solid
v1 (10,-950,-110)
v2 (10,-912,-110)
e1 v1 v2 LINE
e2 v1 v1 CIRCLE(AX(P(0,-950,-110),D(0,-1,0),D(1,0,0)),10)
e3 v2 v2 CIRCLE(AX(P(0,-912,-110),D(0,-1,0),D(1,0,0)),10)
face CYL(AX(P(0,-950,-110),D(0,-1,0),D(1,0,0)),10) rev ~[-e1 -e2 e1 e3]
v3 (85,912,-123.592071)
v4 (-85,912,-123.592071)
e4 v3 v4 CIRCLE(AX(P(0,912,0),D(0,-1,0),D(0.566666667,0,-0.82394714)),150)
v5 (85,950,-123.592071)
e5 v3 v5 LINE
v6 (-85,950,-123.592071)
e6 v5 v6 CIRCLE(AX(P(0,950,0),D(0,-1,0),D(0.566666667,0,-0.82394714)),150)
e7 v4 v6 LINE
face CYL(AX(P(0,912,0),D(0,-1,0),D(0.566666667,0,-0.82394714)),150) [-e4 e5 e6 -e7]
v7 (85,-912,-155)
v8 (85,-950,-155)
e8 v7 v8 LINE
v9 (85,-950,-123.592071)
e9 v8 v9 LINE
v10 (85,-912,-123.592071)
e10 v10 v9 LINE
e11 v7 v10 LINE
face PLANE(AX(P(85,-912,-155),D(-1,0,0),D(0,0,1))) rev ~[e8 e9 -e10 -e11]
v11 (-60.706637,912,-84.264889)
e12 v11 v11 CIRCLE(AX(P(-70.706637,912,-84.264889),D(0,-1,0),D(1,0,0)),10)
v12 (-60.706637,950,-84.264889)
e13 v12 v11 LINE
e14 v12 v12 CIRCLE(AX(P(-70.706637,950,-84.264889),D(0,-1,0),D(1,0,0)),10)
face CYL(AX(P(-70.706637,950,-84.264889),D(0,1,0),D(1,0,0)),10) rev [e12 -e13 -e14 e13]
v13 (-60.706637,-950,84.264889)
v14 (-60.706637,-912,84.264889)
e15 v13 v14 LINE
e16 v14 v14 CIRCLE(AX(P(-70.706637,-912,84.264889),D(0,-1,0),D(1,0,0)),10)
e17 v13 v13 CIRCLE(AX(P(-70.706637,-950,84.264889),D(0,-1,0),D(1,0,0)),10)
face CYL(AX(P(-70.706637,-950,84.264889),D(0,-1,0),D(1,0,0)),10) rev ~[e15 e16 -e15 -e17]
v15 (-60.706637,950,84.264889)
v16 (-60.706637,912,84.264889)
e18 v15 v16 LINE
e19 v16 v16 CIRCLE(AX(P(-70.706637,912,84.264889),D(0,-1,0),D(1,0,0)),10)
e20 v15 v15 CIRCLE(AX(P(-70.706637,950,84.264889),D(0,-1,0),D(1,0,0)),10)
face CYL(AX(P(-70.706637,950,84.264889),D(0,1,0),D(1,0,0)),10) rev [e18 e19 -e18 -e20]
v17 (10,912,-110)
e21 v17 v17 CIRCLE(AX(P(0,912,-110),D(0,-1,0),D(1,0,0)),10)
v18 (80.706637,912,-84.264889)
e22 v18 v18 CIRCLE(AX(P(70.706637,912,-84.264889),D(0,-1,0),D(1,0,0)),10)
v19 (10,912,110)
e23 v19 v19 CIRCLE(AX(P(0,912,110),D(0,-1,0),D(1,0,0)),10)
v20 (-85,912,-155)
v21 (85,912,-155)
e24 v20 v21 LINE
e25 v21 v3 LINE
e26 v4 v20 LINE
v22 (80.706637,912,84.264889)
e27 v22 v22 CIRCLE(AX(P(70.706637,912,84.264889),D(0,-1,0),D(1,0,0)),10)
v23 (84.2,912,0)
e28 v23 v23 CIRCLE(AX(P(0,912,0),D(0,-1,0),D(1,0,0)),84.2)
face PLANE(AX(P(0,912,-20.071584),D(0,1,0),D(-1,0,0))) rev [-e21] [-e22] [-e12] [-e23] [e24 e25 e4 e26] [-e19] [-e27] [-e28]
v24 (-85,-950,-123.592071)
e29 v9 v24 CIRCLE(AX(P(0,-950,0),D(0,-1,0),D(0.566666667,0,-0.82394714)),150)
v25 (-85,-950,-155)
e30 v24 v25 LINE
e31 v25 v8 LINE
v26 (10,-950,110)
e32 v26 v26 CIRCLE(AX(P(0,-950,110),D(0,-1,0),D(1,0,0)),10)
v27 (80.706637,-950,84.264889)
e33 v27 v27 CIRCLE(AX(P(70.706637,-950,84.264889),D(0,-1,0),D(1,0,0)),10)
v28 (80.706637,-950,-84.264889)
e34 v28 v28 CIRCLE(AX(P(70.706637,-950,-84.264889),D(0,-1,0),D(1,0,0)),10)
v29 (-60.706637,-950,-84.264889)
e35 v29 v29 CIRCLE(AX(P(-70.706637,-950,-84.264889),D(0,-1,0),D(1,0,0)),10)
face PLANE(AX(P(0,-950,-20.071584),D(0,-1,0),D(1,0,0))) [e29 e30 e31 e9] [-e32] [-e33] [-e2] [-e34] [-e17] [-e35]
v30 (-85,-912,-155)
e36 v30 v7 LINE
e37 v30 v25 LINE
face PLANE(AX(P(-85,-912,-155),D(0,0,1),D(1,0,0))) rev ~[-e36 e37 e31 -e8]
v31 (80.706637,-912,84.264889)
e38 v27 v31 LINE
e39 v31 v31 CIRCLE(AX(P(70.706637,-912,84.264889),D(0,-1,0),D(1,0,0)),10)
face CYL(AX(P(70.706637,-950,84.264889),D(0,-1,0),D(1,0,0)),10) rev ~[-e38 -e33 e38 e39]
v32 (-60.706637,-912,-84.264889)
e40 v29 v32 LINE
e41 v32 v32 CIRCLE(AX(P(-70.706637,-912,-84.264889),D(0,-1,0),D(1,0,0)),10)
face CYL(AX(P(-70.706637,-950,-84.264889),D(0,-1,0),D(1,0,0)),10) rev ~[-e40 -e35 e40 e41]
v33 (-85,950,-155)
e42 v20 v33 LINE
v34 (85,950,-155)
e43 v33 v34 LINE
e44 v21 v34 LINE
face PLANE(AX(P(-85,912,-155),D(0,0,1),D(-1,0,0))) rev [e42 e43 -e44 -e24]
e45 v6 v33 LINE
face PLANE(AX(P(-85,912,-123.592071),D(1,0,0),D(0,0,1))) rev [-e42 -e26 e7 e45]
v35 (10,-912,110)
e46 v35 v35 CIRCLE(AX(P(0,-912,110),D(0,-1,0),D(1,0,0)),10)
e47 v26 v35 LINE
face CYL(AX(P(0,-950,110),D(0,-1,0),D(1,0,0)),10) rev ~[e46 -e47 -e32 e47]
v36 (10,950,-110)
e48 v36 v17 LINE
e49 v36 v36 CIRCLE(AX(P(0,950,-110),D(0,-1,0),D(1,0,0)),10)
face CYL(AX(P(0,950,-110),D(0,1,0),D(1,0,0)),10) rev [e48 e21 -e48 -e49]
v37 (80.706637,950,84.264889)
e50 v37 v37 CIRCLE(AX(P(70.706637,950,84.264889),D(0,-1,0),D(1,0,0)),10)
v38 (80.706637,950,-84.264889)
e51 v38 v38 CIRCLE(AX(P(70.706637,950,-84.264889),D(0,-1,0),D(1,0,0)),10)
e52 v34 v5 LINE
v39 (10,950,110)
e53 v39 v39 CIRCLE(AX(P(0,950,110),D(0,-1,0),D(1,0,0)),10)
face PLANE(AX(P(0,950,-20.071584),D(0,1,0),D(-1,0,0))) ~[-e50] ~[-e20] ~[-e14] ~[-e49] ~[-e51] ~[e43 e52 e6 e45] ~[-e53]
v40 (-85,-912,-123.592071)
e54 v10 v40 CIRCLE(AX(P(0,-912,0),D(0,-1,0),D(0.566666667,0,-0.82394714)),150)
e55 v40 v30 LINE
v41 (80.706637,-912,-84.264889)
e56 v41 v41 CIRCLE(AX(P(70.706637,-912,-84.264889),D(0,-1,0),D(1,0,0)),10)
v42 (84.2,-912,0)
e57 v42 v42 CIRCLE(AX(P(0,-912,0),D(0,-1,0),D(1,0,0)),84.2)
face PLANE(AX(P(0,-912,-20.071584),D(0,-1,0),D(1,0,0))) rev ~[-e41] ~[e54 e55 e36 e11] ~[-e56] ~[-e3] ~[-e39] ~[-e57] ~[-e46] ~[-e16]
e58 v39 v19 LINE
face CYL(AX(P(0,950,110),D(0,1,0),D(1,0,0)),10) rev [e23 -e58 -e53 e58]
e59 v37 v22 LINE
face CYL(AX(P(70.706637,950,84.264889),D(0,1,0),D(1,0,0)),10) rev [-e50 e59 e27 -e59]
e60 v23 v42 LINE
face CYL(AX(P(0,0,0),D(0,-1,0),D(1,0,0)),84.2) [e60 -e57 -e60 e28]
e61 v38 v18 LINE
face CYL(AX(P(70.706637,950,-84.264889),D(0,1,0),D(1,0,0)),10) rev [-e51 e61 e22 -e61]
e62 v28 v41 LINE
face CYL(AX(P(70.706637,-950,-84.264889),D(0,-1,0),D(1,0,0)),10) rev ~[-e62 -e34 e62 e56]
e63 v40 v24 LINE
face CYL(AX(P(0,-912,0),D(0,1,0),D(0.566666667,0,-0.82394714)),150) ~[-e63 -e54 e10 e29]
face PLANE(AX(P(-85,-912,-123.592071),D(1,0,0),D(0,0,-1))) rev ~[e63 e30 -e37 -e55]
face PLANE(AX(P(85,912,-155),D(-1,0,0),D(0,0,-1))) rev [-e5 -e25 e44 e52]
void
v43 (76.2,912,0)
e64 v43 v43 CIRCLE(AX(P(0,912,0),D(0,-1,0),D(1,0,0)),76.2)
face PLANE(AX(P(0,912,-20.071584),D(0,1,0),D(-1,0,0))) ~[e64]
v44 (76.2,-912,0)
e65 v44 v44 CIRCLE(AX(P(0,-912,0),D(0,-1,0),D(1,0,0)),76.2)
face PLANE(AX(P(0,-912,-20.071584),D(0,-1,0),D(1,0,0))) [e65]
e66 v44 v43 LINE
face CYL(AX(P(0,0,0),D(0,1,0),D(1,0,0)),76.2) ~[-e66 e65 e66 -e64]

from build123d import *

# Parameters (mm, degrees)
F0_R      = 84.2
F0_R_2    = 76.2
F1_DEPTH  = 912
F2_R      = 75
F3_DEPTH  = 10
F4_R      = 10
F5_DEPTH  = 10
F8_DEPTH  = 38
F9_R      = 10
F10_DEPTH = 38


# Not quite as in the source:
# - a pattern or mirror of a feature is missing from the dataset's text; its kind, count and spacing are read off the source's solid
# - a feature names something its author has since deleted; it is built from what else it names


with BuildPart() as f1:
    # F0 (on Front) → F1 (new body, symmetric)
    with BuildSketch(Plane.XZ):
        Circle(F0_R)
        Circle(F0_R_2, mode=Mode.SUBTRACT)
    extrude(amount=F1_DEPTH, both=True)

    # F7 (on face) → F8 (join)
    with BuildSketch(Plane.XZ.offset(912)):
        with BuildLine():
            Line((85, -155), (85, -123.5920709431))
            ThreePointArc((85, -123.5920709431), (0, 150), (-85, -123.5920709431))
            Line((-85, -123.5920709431), (-85, -155))
            Line((-85, -155), (85, -155))
        make_face()
    f8 = extrude(amount=F8_DEPTH)

    # F8_copies: F8 across plane
    add(f8.mirror(Plane.ZX))

    # F9 (on face) → F10 (cut, through all)
    with BuildSketch(Plane.XZ.offset(950)):
        with Locations((-70.7066370655, 84.2648887431)):
            Circle(F9_R)
        with Locations((0, 110)):
            Circle(F9_R)
        with Locations((70.7066370655, 84.2648887431)):
            Circle(F9_R)
        with Locations((-70.7066370655, -84.2648887431)):
            Circle(F9_R)
        with Locations((0, -110)):
            Circle(F9_R)
        with Locations((70.7066370655, -84.2648887431)):
            Circle(F9_R)
    f10 = extrude(amount=-F10_DEPTH, mode=Mode.SUBTRACT)

    # F10_copies: F10 across plane
    add(f10.mirror(Plane.ZX), mode=Mode.SUBTRACT)


with BuildPart() as f3:
    # F2 (on face) → F3 (new body)
    with BuildSketch(Plane.XZ.offset(912)):
        Circle(F2_R)
    extrude(amount=F3_DEPTH)

    # F4 (on face) → F5 (cut, through all)
    with BuildSketch(Plane.XZ.offset(922)):
        with Locations((0, 61)):
            Circle(F4_R)
        with Locations((-52.8275496309, 30.5)):
            Circle(F4_R)
        with Locations((-52.8275496309, -30.5)):
            Circle(F4_R)
        with Locations((0, -61)):
            Circle(F4_R)
        with Locations((52.8275496309, -30.5)):
            Circle(F4_R)
        with Locations((52.8275496309, 30.5)):
            Circle(F4_R)
    extrude(amount=-F5_DEPTH, mode=Mode.SUBTRACT)


solid = f1.part
